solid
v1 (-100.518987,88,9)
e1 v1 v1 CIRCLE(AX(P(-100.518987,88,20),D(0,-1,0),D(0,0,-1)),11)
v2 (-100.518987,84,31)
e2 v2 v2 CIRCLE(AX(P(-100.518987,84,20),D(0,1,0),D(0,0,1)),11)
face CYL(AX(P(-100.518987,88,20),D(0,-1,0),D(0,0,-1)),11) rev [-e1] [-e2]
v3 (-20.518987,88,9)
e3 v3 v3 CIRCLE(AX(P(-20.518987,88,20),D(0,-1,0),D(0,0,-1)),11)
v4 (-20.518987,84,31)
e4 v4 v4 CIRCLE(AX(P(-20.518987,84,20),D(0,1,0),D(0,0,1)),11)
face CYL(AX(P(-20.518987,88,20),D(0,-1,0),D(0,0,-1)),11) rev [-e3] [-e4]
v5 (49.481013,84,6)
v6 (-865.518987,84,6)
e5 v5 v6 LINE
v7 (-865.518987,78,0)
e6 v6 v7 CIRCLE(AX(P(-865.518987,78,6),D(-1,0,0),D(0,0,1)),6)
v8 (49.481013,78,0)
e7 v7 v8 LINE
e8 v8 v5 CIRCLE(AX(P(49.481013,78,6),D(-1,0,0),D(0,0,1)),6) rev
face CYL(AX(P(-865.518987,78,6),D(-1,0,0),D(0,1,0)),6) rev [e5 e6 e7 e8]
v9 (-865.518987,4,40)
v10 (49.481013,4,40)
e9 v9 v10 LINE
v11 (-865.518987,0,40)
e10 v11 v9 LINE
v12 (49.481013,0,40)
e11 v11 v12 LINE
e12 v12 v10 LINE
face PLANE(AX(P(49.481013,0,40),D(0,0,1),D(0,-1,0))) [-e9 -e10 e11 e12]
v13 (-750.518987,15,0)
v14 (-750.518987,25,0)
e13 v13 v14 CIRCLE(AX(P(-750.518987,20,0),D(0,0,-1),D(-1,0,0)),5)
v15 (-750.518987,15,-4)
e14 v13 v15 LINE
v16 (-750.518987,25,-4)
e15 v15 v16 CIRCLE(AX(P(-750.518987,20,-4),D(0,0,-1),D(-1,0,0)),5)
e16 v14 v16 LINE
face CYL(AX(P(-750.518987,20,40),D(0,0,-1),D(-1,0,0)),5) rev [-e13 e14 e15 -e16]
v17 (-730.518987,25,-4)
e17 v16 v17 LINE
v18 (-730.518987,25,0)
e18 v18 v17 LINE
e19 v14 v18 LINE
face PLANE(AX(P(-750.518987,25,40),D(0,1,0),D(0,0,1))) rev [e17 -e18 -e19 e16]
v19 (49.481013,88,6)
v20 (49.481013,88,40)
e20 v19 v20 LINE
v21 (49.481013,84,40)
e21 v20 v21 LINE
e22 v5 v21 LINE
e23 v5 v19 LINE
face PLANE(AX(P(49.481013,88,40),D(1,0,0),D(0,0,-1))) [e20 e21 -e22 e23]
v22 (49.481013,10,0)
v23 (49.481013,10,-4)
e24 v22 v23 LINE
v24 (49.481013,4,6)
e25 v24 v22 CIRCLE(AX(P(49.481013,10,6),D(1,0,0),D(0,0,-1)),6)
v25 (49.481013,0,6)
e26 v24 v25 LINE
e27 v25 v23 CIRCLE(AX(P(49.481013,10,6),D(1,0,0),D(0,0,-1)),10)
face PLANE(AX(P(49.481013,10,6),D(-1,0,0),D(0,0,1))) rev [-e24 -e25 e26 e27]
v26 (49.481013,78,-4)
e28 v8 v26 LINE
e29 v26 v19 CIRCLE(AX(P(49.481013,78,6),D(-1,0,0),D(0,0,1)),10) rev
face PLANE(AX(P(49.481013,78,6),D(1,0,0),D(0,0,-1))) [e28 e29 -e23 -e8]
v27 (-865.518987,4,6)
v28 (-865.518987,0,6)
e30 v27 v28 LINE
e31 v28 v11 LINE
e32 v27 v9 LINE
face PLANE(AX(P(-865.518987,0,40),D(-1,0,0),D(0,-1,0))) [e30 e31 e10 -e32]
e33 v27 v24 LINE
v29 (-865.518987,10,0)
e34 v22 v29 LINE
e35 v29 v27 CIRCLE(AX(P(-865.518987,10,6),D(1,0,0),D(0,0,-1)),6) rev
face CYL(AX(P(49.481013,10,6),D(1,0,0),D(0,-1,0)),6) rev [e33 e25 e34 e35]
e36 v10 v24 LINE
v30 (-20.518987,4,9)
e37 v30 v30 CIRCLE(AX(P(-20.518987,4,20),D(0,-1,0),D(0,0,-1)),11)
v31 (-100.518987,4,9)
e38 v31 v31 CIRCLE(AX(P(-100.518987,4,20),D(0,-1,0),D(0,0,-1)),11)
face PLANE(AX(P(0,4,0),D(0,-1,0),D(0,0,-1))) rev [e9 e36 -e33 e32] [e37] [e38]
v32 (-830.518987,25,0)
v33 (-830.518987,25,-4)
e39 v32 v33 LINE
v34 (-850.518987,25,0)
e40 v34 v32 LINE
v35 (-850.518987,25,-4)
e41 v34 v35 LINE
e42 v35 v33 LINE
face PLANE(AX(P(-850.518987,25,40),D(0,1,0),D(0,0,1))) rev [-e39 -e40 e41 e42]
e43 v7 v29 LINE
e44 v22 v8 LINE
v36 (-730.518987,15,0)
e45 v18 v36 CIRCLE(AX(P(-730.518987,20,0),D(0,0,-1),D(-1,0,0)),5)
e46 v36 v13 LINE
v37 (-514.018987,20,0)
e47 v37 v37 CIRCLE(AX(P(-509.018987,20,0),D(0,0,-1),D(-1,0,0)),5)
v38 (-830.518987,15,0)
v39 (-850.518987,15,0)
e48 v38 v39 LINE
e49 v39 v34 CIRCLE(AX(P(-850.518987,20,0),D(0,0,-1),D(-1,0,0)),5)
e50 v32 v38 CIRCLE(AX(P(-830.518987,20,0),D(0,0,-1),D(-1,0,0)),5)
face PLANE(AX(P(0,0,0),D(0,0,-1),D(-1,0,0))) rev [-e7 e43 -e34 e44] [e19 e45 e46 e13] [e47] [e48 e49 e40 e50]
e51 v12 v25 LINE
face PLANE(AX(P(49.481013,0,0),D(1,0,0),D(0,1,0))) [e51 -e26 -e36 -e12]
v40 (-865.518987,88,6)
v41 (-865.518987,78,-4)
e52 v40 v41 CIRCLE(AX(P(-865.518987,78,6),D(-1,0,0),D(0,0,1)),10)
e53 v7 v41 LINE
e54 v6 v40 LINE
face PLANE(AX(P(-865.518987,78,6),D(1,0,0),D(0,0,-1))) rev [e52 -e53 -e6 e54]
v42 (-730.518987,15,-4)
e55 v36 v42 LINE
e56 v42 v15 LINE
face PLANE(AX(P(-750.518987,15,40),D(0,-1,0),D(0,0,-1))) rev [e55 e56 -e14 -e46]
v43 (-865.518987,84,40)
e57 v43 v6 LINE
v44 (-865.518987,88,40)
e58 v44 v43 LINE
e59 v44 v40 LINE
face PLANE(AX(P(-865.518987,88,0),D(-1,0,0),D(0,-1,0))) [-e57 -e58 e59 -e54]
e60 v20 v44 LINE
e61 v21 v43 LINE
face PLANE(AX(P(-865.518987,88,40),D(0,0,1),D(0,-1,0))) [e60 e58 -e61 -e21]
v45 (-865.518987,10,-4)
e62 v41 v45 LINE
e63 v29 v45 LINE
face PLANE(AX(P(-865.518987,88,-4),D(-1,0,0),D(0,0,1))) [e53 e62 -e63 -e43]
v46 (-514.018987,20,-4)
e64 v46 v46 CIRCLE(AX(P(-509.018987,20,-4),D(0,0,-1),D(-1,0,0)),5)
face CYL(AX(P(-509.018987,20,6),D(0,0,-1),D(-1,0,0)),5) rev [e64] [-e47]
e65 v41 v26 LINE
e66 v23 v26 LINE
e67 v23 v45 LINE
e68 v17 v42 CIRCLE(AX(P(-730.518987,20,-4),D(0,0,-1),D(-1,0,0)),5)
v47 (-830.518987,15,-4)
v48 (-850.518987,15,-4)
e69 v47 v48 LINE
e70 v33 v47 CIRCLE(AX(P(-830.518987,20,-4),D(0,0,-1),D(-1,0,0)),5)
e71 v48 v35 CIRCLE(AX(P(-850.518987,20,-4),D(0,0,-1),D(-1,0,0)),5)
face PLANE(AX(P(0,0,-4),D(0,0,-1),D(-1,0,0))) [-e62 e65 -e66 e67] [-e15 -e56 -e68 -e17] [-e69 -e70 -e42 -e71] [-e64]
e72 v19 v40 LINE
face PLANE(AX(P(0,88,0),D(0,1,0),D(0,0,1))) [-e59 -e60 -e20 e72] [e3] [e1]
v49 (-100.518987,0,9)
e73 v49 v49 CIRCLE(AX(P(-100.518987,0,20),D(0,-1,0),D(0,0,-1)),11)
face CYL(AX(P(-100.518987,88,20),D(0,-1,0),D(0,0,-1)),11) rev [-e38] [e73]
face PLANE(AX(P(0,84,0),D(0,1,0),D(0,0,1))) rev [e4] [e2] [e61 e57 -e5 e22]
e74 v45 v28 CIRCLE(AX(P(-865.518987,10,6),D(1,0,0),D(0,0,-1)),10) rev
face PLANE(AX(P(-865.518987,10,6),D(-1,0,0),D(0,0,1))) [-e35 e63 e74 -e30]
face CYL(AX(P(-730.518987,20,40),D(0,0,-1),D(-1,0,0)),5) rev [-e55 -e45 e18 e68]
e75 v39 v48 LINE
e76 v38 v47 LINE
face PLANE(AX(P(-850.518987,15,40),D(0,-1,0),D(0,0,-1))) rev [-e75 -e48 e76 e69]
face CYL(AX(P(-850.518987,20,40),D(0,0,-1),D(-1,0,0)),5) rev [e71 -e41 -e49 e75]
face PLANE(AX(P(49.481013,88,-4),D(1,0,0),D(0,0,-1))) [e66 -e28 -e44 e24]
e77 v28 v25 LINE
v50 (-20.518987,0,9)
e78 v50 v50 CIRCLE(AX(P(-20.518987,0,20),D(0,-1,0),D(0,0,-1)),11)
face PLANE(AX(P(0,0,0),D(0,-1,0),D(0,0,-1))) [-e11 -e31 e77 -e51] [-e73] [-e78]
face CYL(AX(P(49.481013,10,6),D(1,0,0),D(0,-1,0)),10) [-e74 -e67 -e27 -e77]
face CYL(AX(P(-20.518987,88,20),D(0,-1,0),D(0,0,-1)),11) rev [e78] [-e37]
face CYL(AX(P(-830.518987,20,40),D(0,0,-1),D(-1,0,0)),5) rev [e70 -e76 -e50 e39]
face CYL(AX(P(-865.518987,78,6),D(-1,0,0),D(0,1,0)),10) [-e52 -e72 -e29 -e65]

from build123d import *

# Parameters (mm, degrees)
SKETCH1_W                    = 915
SKETCH1_H                    = 88
BASE_FLANGE1_DEPTH           = 4
EDGE_FLANGE1_STRIP_W         = 28
EDGE_FLANGE1_STRIP_H         = 4
EDGE_FLANGE1_STRIP_CUT_DEPTH = 915
EDGE_FLANGE1_DEPTH           = 915
EDGE_FLANGE2_STRIP_W         = 28
EDGE_FLANGE2_STRIP_H         = 4
EDGE_FLANGE2_STRIP_CUT_DEPTH = 915
EDGE_FLANGE2_DEPTH           = 915
CUT_EXTRUDE1_DEPTH           = 871.900176512
CUT_EXTRUDE1_DEPTH_BACK      = 871.900176512
SKETCH12_R                   = 11
CUT_EXTRUDE2_DEPTH           = 872.093059006
SKETCH16_R                   = 5
CUT_EXTRUDE4_DEPTH           = 10


# Sheet-metal steps are written as plain solids
with BuildPart() as part:
    # Sketch1 → Base-Flange1 (new body)
    with BuildSketch(Plane.XY):
        with Locations((-408.018987342, 44)):
            Rectangle(SKETCH1_W, SKETCH1_H)
    extrude(amount=-BASE_FLANGE1_DEPTH)

    # Edge-Flange1 strip (across the edge) → Edge-Flange1 strip cut (cut)
    with BuildSketch(Plane(origin=(49.481012658, 88, 0), x_dir=(0, -1, 0), z_dir=(-1, 0, 0))):
        with Locations((-4, -2)):
            Rectangle(EDGE_FLANGE1_STRIP_W, EDGE_FLANGE1_STRIP_H)
    extrude(amount=EDGE_FLANGE1_STRIP_CUT_DEPTH, mode=Mode.SUBTRACT)

    # Edge-Flange1 section (across the edge) → Edge-Flange1 (add)
    with BuildSketch(Plane(origin=(49.481012658, 88, 0), x_dir=(0, -1, 0), z_dir=(-1, 0, 0))):
        with BuildLine():
            Line((0, 6), (0, 40))
            Line((0, 40), (4, 40))
            Line((4, 40), (4, 6))
            ThreePointArc((4, 6), (5.757359313, 1.757359313), (10, 0))
            Line((10, 0), (10, -4))
            ThreePointArc((10, -4), (2.928932188, -1.071067812), (0, 6))
        make_face()
    extrude(amount=EDGE_FLANGE1_DEPTH)

    # Edge-Flange2 strip (across the edge) → Edge-Flange2 strip cut (cut)
    with BuildSketch(Plane.YZ.offset(-865.518987342)):
        with Locations((-4, -2)):
            Rectangle(EDGE_FLANGE2_STRIP_W, EDGE_FLANGE2_STRIP_H)
    extrude(amount=EDGE_FLANGE2_STRIP_CUT_DEPTH, mode=Mode.SUBTRACT)

    # Edge-Flange2 section (across the edge) → Edge-Flange2 (add)
    with BuildSketch(Plane.YZ.offset(-865.518987342)):
        with BuildLine():
            Line((0, 6), (0, 40))
            Line((0, 40), (4, 40))
            Line((4, 40), (4, 6))
            ThreePointArc((4, 6), (5.757359313, 1.757359313), (10, 0))
            Line((10, 0), (10, -4))
            ThreePointArc((10, -4), (2.928932188, -1.071067812), (0, 6))
        make_face()
    extrude(amount=EDGE_FLANGE2_DEPTH)

    # Sketch12 → Cut-Extrude1 (cut, two sides: drawn at the far end of the back side and taken through both)
    with BuildSketch(Plane.XZ.offset(-CUT_EXTRUDE1_DEPTH_BACK)):
        with Locations(Location((-100.518987342, 20, 0), (0, 0, 270))):
            Circle(SKETCH12_R)
        with Locations(Location((-20.518987342, 20, 0), (0, 0, 270))):
            Circle(SKETCH12_R)
    extrude(amount=CUT_EXTRUDE1_DEPTH + CUT_EXTRUDE1_DEPTH_BACK, mode=Mode.SUBTRACT)

    # Sketch13 → Cut-Extrude2 (cut, through all)
    with BuildSketch(Plane(origin=(0, 0, -4), x_dir=(-1, 0, 0), z_dir=(0, 0, -1))):
        with BuildLine():
            Line((850.518987342, 15), (830.518987342, 15))
            ThreePointArc((830.518987342, 15), (825.518987342, 20), (830.518987342, 25))
            Line((830.518987342, 25), (850.518987342, 25))
            ThreePointArc((850.518987342, 25), (855.518987342, 20), (850.518987342, 15))
        make_face()
        with BuildLine():
            Line((750.518987342, 15), (730.518987342, 15))
            ThreePointArc((730.518987342, 15), (725.518987342, 20), (730.518987342, 25))
            Line((730.518987342, 25), (750.518987342, 25))
            ThreePointArc((750.518987342, 25), (755.518987342, 20), (750.518987342, 15))
        make_face()
    extrude(amount=-CUT_EXTRUDE2_DEPTH, mode=Mode.SUBTRACT)

    # Sketch16 → Cut-Extrude4 (cut)
    with BuildSketch(Plane(origin=(0, 0, -4), x_dir=(-1, 0, 0), z_dir=(0, 0, -1))):
        with Locations((509.018987342, 20)):
            Circle(SKETCH16_R)
    extrude(amount=-CUT_EXTRUDE4_DEPTH, mode=Mode.SUBTRACT)


solid = part.part
